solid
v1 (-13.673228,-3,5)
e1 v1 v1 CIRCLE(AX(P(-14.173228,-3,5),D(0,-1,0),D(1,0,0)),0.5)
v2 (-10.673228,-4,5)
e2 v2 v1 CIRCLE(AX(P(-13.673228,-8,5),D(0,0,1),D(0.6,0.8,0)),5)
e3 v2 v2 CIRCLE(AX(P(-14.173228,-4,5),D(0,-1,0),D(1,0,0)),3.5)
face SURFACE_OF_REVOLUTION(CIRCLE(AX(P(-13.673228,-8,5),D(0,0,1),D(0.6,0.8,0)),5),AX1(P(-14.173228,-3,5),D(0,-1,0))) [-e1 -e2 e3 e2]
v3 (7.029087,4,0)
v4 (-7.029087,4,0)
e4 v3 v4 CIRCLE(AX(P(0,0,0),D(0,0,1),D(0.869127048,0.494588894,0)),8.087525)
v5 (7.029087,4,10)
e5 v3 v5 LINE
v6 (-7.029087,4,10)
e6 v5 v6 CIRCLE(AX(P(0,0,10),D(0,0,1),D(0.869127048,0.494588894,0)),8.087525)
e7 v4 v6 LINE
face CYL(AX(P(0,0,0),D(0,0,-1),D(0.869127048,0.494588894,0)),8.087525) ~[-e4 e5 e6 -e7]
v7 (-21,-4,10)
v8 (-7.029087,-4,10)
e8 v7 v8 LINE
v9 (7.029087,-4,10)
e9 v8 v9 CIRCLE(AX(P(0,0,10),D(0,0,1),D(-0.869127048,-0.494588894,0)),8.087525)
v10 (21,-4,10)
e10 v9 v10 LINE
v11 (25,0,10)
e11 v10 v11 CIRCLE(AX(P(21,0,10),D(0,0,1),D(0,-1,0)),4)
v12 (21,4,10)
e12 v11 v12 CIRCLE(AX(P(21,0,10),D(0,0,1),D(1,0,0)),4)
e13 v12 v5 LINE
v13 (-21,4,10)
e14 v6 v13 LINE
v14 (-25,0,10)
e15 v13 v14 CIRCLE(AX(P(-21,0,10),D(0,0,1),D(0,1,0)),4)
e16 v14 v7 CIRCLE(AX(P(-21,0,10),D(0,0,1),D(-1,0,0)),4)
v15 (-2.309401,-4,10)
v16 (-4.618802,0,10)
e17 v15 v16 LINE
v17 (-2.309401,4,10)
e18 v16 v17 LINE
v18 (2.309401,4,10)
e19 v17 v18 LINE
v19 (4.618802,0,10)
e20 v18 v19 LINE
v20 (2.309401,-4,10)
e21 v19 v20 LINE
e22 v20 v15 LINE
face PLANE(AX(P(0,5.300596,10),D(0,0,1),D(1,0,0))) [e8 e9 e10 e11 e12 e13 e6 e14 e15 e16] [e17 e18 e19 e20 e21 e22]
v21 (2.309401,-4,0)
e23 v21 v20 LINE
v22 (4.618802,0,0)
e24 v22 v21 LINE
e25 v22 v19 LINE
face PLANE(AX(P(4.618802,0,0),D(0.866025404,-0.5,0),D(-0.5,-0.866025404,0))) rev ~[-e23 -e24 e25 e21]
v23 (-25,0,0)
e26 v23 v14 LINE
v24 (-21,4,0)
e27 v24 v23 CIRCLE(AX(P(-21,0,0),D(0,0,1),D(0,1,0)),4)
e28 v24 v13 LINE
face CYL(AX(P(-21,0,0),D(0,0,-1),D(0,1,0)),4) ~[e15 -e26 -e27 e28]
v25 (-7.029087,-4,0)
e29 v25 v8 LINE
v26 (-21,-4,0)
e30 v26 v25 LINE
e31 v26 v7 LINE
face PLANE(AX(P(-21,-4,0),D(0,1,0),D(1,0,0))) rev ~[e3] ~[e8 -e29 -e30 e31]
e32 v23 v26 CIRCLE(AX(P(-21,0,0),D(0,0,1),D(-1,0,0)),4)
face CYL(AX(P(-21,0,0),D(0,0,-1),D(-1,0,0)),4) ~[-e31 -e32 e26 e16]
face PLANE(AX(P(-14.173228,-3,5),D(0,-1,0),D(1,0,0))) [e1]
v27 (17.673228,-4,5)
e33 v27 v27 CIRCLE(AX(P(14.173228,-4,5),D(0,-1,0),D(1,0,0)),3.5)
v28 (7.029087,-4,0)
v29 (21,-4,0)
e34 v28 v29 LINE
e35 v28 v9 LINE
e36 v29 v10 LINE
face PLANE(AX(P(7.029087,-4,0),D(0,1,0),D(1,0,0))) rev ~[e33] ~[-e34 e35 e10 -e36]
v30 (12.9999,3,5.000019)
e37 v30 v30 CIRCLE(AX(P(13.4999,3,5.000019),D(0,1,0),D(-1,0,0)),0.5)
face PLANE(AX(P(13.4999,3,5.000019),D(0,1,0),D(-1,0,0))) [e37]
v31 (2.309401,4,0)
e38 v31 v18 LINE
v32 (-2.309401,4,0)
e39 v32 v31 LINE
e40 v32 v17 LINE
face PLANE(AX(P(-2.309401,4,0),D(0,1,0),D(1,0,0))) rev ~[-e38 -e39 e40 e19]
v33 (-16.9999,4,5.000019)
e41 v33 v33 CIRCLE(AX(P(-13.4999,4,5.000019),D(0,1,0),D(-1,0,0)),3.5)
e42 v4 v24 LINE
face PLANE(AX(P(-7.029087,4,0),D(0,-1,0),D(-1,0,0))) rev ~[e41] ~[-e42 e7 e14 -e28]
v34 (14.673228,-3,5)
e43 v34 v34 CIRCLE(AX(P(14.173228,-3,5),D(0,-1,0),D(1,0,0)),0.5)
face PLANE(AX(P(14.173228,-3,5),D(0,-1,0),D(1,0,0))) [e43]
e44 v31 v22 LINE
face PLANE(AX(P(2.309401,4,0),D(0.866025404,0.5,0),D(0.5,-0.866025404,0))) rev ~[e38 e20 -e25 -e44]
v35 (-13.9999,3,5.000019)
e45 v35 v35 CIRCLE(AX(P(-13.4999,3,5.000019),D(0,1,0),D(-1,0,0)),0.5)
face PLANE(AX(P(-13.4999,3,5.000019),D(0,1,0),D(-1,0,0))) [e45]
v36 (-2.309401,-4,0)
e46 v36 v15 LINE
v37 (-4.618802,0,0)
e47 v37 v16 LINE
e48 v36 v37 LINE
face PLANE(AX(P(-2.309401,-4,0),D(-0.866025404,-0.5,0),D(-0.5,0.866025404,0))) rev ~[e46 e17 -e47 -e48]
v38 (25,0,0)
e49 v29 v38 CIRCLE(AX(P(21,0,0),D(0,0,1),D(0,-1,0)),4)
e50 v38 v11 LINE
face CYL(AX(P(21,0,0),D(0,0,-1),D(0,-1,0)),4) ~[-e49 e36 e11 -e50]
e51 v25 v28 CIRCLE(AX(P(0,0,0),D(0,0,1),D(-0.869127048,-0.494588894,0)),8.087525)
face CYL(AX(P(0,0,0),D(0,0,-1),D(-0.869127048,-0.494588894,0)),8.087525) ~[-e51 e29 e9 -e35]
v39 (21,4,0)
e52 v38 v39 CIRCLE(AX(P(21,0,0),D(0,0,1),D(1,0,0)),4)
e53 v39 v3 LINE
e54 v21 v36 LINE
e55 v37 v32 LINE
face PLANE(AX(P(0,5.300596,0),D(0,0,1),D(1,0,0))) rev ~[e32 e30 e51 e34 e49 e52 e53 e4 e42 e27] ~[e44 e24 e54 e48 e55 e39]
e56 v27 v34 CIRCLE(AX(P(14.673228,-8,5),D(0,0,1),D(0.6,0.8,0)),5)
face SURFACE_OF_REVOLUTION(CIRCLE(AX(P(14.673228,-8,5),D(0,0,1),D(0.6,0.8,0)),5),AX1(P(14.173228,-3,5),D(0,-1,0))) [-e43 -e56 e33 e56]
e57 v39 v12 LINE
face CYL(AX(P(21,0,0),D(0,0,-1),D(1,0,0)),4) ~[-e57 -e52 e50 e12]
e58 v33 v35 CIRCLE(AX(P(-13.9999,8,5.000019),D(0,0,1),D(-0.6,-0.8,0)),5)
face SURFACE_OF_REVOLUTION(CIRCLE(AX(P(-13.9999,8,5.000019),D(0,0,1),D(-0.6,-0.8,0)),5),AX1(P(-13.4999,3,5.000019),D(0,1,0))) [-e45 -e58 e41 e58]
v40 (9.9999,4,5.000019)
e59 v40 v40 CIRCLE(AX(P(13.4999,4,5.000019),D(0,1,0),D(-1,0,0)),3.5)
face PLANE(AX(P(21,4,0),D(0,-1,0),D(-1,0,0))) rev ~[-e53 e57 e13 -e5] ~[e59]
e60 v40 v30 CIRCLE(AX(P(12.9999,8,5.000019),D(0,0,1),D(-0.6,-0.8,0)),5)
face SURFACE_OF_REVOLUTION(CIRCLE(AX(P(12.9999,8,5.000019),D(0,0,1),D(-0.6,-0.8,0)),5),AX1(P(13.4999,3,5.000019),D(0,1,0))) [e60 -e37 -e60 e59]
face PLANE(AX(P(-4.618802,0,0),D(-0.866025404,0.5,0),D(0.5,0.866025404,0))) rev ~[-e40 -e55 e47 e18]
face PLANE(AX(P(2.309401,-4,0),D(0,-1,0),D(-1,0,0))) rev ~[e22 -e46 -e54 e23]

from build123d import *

# Parameters (mm, degrees)
F1_DEPTH = 10
F2_R     = 3.5
F4_DEPTH = 1
F3_R     = 3.5
F6_DEPTH = 1


# Not quite as in the source:
# - a fillet or chamfer that OpenCascade refuses, or shapes differently, is made with other operations: its cross-section is extruded or revolved along the edge and cut away or added


with BuildPart() as f1:
    # F0 (on Top) → F1 (new body)
    with BuildSketch(Plane.XY):
        with BuildLine():
            Line((-7.0290866446, 4), (-2.3094010768, 4))
            Line((-2.3094010768, 4), (2.3094010768, 4))
            Line((2.3094010768, 4), (7.0290866446, 4))
            ThreePointArc((7.0290866446, 4), (0, 8.087524903), (-7.0290866446, 4))
        make_face()
        with BuildLine():
            Line((-4.6188021535, 0), (-2.3094010768, 4))
            Line((-2.3094010768, 4), (-7.0290866446, 4))
            ThreePointArc((-7.0290866446, 4), (-8.087524903, 0), (-7.0290866446, -4))
            Line((-7.0290866446, -4), (-2.3094010768, -4))
            Line((-2.3094010768, -4), (-4.6188021535, 0))
        make_face()
        with BuildLine():
            Line((7.0290866446, 4), (2.3094010768, 4))
            Line((2.3094010768, 4), (4.6188021535, 0))
            Line((4.6188021535, 0), (2.3094010768, -4))
            Line((2.3094010768, -4), (7.0290866446, -4))
            ThreePointArc((7.0290866446, -4), (7.8184388576, -2.068833702), (8.087524903, 0))
            ThreePointArc((8.087524903, 0), (7.8184388576, 2.068833702), (7.0290866446, 4))
        make_face()
        with BuildLine():
            ThreePointArc((-7.0290866446, -4), (-8.087524903, 0), (-7.0290866446, 4))
            Line((-7.0290866446, 4), (-21, 4))
            ThreePointArc((-21, 4), (-23.8284271247, 2.8284271247), (-25, 0))
            ThreePointArc((-25, 0), (-23.8284271247, -2.8284271247), (-21, -4))
            Line((-21, -4), (-7.0290866446, -4))
        make_face()
        with BuildLine():
            Line((21, 4), (7.0290866446, 4))
            ThreePointArc((7.0290866446, 4), (7.8184388576, 2.068833702), (8.087524903, 0))
            ThreePointArc((8.087524903, 0), (7.8184388576, -2.068833702), (7.0290866446, -4))
            Line((7.0290866446, -4), (21, -4))
            ThreePointArc((21, -4), (23.8284271247, -2.8284271247), (25, 0))
            ThreePointArc((25, 0), (23.8284271247, 2.8284271247), (21, 4))
        make_face()
        with BuildLine():
            Line((2.3094010768, -4), (-2.3094010768, -4))
            Line((-2.3094010768, -4), (-7.0290866446, -4))
            ThreePointArc((-7.0290866446, -4), (0, -8.087524903), (7.0290866446, -4))
            Line((7.0290866446, -4), (2.3094010768, -4))
        make_face()
    extrude(amount=F1_DEPTH)

    # F2 (on face) → F4 (cut)
    with BuildSketch(Plane.XZ.offset(4)):
        with Locations((-14.1732281117, 5)):
            Circle(F2_R)
        with Locations((14.1732281117, 5)):
            Circle(F2_R)
    extrude(amount=-F4_DEPTH, mode=Mode.SUBTRACT)

    # F5: fillet of radius 5 on 2 edges, made by hand

    # F5_s1 → F5_t2 (revolve)
    with BuildSketch(Plane.XY.offset(5)):
        with BuildLine():
            ThreePointArc((-10.6732281117, -4), (-12.0920892816, -3.2565835097), (-13.6732281117, -3))
            Line((-13.6732281117, -3), (-10.6732281117, -3))
            Line((-10.6732281117, -3), (-10.6732281117, -4))
        make_face()
    revolve(axis=Axis((-14.1732281117, -3, 5), (0, -1, 0)))

    # F5_s3 → F5_t4 (revolve)
    with BuildSketch(Plane.XY.offset(5)):
        with BuildLine():
            ThreePointArc((17.6732281117, -4), (16.2543669417, -3.2565835097), (14.6732281117, -3))
            Line((14.6732281117, -3), (17.6732281117, -3))
            Line((17.6732281117, -3), (17.6732281117, -4))
        make_face()
    revolve(axis=Axis((14.1732281117, -3, 5), (0, -1, 0)))

    # F3 (on face) → F6 (cut)
    with BuildSketch(Plane(origin=(0, 4, 0), x_dir=(-1, 0, 0), z_dir=(0, 1, 0))):
        with Locations((13.4998997673, 5.0000185147)):
            Circle(F3_R)
        with Locations((-13.4998997673, 5.0000185147)):
            Circle(F3_R)
    extrude(amount=-F6_DEPTH, mode=Mode.SUBTRACT)

    # F7: fillet of radius 5 on 2 edges, made by hand

    # F7_s1 → F7_t2 (revolve)
    with BuildSketch(Plane.XY.offset(5.0000185147)):
        with BuildLine():
            ThreePointArc((9.9998997673, 4), (11.4187609373, 3.2565835097), (12.9998997673, 3))
            Line((12.9998997673, 3), (9.9998997673, 3))
            Line((9.9998997673, 3), (9.9998997673, 4))
        make_face()
    revolve(axis=Axis((13.4998997673, 3, 5.0000185147), (0, 1, 0)))

    # F7_s3 → F7_t4 (revolve)
    with BuildSketch(Plane.XY.offset(5.0000185147)):
        with BuildLine():
            ThreePointArc((-16.9998997673, 4), (-15.5810385974, 3.2565835097), (-13.9998997673, 3))
            Line((-13.9998997673, 3), (-16.9998997673, 3))
            Line((-16.9998997673, 3), (-16.9998997673, 4))
        make_face()
    revolve(axis=Axis((-13.4998997673, 3, 5.0000185147), (0, 1, 0)))


solid = f1.part
